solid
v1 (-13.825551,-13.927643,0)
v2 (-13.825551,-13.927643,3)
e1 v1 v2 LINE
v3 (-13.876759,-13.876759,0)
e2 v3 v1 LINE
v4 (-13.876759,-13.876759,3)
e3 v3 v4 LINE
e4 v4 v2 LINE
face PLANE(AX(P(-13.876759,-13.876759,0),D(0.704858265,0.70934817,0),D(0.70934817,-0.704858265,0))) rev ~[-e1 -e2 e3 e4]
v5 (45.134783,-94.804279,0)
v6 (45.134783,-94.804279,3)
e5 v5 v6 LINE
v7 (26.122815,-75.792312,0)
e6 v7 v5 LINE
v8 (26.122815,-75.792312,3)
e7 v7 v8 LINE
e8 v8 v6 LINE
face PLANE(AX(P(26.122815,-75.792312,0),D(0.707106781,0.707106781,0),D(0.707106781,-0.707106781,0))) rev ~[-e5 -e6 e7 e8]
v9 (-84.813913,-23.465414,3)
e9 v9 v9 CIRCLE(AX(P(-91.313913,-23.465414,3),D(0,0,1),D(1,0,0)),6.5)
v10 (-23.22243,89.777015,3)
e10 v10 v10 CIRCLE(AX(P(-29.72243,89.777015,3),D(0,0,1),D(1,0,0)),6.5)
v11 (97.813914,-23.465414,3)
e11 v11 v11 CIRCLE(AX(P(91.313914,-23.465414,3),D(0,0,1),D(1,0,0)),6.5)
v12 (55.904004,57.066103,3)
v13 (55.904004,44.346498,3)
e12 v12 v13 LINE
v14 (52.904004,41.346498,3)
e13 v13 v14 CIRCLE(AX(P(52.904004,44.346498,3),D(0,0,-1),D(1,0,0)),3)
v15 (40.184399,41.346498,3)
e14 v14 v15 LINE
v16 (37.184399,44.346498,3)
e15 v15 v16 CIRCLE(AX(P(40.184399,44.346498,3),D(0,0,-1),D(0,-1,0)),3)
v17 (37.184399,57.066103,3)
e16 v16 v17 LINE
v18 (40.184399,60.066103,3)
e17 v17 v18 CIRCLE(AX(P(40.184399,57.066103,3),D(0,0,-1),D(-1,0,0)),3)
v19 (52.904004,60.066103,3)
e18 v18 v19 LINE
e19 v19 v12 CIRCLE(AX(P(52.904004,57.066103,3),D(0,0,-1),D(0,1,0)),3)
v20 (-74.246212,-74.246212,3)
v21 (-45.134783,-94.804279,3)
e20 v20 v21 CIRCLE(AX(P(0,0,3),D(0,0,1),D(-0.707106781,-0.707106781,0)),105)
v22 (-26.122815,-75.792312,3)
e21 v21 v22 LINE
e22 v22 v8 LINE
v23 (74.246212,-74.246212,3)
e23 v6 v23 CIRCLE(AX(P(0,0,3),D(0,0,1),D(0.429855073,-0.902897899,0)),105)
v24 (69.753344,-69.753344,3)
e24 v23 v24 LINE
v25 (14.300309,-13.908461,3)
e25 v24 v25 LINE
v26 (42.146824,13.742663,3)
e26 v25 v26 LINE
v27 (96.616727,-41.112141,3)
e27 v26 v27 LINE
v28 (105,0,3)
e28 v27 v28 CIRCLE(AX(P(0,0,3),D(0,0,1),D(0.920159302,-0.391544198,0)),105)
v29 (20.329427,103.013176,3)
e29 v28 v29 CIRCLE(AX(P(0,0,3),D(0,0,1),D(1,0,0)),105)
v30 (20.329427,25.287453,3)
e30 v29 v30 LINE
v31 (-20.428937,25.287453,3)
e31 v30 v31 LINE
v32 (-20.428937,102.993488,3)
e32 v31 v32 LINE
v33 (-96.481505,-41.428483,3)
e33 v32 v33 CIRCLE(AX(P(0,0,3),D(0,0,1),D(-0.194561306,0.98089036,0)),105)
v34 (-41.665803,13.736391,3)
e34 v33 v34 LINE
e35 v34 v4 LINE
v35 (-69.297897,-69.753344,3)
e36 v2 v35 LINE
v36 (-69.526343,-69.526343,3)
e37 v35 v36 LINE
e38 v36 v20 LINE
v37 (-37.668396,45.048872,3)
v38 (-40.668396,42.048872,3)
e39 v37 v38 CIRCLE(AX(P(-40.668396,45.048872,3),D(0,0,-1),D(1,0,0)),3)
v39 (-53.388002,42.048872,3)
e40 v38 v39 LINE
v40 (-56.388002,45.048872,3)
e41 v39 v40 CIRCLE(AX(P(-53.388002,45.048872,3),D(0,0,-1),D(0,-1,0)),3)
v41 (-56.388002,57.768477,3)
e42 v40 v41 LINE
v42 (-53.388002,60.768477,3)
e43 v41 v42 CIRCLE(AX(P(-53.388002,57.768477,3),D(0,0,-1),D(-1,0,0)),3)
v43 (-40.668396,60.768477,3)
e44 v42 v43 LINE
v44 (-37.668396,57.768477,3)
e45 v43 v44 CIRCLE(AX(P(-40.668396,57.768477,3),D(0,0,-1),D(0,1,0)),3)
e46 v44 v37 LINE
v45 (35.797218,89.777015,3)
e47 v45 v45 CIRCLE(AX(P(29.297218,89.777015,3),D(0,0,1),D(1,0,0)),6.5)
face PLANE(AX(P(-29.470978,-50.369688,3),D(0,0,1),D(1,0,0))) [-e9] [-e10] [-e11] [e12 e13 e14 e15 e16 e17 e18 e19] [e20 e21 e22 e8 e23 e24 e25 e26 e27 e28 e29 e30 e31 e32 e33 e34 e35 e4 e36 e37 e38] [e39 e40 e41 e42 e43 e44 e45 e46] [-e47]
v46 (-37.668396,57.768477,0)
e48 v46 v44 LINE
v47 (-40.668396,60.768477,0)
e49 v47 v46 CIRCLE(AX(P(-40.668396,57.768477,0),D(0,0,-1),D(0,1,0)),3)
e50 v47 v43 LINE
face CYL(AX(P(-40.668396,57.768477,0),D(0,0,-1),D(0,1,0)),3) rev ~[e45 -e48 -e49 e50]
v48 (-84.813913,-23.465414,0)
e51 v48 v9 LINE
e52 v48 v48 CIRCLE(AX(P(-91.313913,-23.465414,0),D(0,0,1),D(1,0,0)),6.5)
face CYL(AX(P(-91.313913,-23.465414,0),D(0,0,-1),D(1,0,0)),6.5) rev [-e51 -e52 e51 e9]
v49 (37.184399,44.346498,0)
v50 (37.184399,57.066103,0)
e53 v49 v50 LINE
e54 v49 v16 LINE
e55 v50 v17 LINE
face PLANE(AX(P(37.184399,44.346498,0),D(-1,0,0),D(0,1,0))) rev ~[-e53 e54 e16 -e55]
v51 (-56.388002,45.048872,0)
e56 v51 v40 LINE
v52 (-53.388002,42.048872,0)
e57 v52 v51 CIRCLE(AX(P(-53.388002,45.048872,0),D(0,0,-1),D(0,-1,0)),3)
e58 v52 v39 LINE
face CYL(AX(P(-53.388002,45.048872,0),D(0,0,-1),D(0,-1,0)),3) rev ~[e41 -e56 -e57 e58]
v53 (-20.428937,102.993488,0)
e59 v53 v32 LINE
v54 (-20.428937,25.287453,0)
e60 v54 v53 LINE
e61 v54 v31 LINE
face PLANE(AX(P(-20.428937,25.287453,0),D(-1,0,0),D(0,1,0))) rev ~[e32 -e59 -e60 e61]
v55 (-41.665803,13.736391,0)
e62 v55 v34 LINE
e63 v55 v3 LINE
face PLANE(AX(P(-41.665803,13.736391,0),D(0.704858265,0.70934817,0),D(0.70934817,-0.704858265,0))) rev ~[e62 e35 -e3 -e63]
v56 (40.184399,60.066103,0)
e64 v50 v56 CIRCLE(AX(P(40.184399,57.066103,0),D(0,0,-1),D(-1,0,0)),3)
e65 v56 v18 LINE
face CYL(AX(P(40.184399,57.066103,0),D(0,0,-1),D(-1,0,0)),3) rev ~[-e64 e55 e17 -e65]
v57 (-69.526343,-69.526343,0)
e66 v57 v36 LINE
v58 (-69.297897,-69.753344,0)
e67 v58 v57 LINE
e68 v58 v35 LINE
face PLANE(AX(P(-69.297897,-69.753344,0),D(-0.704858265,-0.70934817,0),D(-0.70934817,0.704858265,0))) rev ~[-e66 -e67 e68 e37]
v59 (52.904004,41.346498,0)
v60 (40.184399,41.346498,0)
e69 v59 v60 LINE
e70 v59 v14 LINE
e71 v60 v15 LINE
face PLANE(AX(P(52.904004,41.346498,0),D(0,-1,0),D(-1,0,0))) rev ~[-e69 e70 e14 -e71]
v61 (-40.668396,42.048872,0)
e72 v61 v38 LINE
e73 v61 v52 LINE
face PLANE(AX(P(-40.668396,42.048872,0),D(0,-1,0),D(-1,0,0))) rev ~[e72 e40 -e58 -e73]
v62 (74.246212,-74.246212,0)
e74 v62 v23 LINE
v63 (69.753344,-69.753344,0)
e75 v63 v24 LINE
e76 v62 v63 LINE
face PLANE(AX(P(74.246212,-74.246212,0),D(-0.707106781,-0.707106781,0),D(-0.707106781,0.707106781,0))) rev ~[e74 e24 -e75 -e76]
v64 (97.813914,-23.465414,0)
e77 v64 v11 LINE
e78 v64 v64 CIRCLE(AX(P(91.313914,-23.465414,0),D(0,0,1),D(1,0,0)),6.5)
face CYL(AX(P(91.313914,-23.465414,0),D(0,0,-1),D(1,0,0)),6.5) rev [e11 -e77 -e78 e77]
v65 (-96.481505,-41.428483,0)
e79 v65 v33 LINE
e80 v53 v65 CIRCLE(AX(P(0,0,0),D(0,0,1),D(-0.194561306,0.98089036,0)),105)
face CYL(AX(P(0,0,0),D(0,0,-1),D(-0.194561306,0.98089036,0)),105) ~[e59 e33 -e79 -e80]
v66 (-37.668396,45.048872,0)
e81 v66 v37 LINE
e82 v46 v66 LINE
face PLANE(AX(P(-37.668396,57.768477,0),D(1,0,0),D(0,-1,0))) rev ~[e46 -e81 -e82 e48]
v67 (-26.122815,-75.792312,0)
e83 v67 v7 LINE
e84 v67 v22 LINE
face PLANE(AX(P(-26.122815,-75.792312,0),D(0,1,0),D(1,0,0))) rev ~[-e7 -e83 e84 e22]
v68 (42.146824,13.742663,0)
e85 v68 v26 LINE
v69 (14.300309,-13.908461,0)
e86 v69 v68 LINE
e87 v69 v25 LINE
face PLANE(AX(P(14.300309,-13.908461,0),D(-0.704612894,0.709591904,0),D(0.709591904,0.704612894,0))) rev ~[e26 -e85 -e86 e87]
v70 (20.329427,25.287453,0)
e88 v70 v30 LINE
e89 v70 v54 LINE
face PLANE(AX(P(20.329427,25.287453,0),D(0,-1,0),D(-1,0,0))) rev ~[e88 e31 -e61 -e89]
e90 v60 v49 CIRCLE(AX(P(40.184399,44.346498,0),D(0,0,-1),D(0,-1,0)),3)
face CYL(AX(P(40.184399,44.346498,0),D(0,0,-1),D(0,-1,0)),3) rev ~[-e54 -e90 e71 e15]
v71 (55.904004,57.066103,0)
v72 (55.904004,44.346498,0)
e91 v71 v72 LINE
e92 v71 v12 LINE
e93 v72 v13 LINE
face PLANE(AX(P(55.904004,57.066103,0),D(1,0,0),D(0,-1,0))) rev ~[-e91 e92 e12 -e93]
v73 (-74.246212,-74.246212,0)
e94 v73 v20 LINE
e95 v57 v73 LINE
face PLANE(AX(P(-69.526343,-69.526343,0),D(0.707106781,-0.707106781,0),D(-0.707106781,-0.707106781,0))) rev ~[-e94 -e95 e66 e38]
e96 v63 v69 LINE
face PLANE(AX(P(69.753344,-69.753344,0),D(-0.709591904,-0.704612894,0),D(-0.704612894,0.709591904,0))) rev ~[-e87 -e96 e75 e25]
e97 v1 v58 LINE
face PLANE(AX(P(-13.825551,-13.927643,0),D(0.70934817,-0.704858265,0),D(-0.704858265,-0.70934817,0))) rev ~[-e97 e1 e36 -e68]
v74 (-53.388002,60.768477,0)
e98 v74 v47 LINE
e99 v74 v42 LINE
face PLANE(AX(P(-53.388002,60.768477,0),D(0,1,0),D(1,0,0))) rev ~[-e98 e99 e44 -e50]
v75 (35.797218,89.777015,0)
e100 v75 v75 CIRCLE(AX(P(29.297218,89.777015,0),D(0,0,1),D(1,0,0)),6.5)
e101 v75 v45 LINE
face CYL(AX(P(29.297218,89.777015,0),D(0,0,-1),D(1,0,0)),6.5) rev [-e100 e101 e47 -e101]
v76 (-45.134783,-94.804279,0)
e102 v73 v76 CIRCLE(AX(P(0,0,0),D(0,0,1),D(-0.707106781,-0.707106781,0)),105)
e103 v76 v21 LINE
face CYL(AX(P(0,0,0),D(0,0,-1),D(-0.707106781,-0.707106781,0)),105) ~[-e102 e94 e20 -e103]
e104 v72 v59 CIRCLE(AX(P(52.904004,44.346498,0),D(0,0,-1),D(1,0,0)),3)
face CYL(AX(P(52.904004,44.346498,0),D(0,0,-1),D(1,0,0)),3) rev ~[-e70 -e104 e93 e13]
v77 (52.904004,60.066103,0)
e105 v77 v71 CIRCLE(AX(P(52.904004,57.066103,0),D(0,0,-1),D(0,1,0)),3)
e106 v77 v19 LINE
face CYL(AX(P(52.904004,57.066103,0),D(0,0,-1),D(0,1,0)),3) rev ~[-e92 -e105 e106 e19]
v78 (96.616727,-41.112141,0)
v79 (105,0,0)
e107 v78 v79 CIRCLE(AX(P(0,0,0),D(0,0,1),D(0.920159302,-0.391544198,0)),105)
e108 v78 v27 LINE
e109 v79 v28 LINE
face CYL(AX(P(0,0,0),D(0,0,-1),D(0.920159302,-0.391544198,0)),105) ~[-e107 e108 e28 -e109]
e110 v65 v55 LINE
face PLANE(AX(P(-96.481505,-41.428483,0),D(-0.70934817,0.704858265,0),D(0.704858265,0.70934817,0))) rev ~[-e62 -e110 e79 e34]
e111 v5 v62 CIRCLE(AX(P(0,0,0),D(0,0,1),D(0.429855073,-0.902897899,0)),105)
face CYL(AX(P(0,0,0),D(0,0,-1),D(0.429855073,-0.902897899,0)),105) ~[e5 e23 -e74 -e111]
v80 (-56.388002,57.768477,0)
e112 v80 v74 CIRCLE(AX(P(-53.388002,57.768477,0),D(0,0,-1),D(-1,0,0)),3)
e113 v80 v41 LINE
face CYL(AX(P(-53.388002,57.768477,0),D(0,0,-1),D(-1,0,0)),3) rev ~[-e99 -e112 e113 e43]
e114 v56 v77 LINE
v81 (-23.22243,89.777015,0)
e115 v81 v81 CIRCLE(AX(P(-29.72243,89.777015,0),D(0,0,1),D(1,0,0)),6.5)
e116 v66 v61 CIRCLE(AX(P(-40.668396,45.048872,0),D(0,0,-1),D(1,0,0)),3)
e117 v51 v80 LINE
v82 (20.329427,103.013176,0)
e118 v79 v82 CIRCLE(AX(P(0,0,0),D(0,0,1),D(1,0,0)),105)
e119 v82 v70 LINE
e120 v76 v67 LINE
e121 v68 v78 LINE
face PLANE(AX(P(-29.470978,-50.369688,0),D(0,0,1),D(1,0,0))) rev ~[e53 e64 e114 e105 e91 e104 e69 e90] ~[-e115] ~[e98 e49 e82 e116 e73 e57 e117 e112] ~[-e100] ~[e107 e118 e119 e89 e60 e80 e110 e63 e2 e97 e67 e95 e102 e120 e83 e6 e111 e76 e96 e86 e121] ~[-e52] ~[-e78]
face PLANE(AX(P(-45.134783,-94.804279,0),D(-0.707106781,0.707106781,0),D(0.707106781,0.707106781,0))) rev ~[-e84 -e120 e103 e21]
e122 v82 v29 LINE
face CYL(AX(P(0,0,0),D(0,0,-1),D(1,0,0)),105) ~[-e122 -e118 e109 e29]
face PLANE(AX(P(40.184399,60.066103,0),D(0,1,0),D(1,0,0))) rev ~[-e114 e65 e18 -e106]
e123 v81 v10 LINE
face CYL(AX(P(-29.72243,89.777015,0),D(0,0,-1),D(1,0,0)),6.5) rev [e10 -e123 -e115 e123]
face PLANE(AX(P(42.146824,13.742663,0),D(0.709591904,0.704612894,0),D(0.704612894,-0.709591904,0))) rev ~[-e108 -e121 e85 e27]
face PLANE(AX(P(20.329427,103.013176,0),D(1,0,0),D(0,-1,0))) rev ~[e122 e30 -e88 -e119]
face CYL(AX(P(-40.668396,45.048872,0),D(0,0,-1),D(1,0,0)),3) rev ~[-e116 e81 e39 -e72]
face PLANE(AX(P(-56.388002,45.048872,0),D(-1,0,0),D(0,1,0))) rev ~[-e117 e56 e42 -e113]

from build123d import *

# Parameters (mm, degrees)
F0_R     = 6.5
F1_DEPTH = 3


with BuildPart() as f1:
    # F0 (on Top) → F1 (new body)
    with BuildSketch(Plane.XY):
        with BuildLine():
            Line((-69.5263431778, -69.5263431778), (-74.2462120246, -74.2462120246))
            ThreePointArc((-74.2462120246, -74.2462120246), (-60.5690845883, -85.7693767736), (-45.1347826829, -94.804279398))
            Line((-45.1347826829, -94.804279398), (-26.1228149757, -75.7923116907))
            Line((-26.1228149757, -75.7923116907), (0, -49.6694967151))
            Line((0, -49.6694967151), (0, 0))
            Line((0, 0), (-13.8767590343, -13.8767590343))
            Line((-13.8767590343, -13.8767590343), (-13.825551364, -13.9276425795))
            Line((-13.825551364, -13.9276425795), (-69.2978968304, -69.7533435465))
            Line((-69.2978968304, -69.7533435465), (-69.5263431778, -69.5263431778))
        make_face()
        Polygon((0, -49.6694967151), (-26.1228149757, -75.7923116907), (0, -75.7923116907), (0, -64.7160249151), align=None)
        with BuildLine():
            ThreePointArc((-20.428937125, 102.9934877939), (-92.9055396428, 48.9240299208), (-96.4815047793, -41.4284833844))
            Line((-96.4815047793, -41.4284833844), (-41.6658031427, 13.7363909711))
            Line((-41.6658031427, 13.7363909711), (-13.8767590343, -13.8767590343))
            Line((-13.8767590343, -13.8767590343), (0, 0))
            Line((0, 0), (0, 25.2874530852))
            Line((0, 25.2874530852), (-20.428937125, 25.2874530852))
            Line((-20.428937125, 25.2874530852), (-20.428937125, 102.9934877939))
        make_face()
        with Locations((-91.3139134645, -23.4654136002)):
            Circle(F0_R, mode=Mode.SUBTRACT)
        with BuildLine():
            ThreePointArc((-56.388001889, 57.7684769799), (-55.5093222326, 59.8897973234), (-53.388001889, 60.7684769799))
            Line((-53.388001889, 60.7684769799), (-40.6683964263, 60.7684769799))
            ThreePointArc((-40.6683964263, 60.7684769799), (-38.5470760828, 59.8897973234), (-37.6683964263, 57.7684769799))
            Line((-37.6683964263, 57.7684769799), (-37.6683964263, 45.0488715172))
            ThreePointArc((-37.6683964263, 45.0488715172), (-38.5470760828, 42.9275511736), (-40.6683964263, 42.0488715172))
            Line((-40.6683964263, 42.0488715172), (-53.388001889, 42.0488715172))
            ThreePointArc((-53.388001889, 42.0488715172), (-55.5093222326, 42.9275511736), (-56.388001889, 45.0488715172))
            Line((-56.388001889, 45.0488715172), (-56.388001889, 57.7684769799))
        make_face(mode=Mode.SUBTRACT)
        with Locations((-29.722429812, 89.7770151496)):
            Circle(F0_R, mode=Mode.SUBTRACT)
        with BuildLine():
            Line((26.1228149757, -75.7923116907), (45.1347826829, -94.804279398))
            ThreePointArc((45.1347826829, -94.804279398), (60.5690845883, -85.7693767736), (74.2462120246, -74.2462120246))
            Line((74.2462120246, -74.2462120246), (69.7533435465, -69.7533435465))
            Line((69.7533435465, -69.7533435465), (0, 0))
            Line((0, 0), (0, -49.6694967151))
            Line((0, -49.6694967151), (26.1228149757, -75.7923116907))
        make_face()
        Polygon((0, -64.7160249151), (0, -75.7923116907), (26.1228149757, -75.7923116907), (0, -49.6694967151), align=None)
        with BuildLine():
            Line((0, 25.2874530852), (0, 0))
            Line((0, 0), (69.7533435465, -69.7533435465))
            Line((69.7533435465, -69.7533435465), (14.3003088274, -13.9084606974))
            Line((14.3003088274, -13.9084606974), (42.1468239183, 13.7426630826))
            Line((42.1468239183, 13.7426630826), (96.6167267267, -41.1121407447))
            ThreePointArc((96.6167267267, -41.1121407447), (102.8828370194, -20.9790811726), (105, 0))
            ThreePointArc((105, 0), (81.1159350321, 66.6723712182), (20.3294269741, 103.013175851))
            Line((20.3294269741, 103.013175851), (20.3294269741, 25.2874530852))
            Line((20.3294269741, 25.2874530852), (0, 25.2874530852))
        make_face()
        with Locations((91.3139144, -23.4654136002)):
            Circle(F0_R, mode=Mode.SUBTRACT)
        with BuildLine():
            ThreePointArc((37.1843986213, 57.0661032964), (38.0630782778, 59.18742364), (40.1843986213, 60.0661032964))
            Line((40.1843986213, 60.0661032964), (52.904004084, 60.0661032964))
            ThreePointArc((52.904004084, 60.0661032964), (55.0253244276, 59.18742364), (55.904004084, 57.0661032964))
            Line((55.904004084, 57.0661032964), (55.904004084, 44.3464978337))
            ThreePointArc((55.904004084, 44.3464978337), (55.0253244276, 42.2251774902), (52.904004084, 41.3464978337))
            Line((52.904004084, 41.3464978337), (40.1843986213, 41.3464978337))
            ThreePointArc((40.1843986213, 41.3464978337), (38.0630782778, 42.2251774902), (37.1843986213, 44.3464978337))
            Line((37.1843986213, 44.3464978337), (37.1843986213, 57.0661032964))
        make_face(mode=Mode.SUBTRACT)
        with Locations((29.2972179146, 89.7770151496)):
            Circle(F0_R, mode=Mode.SUBTRACT)
    extrude(amount=F1_DEPTH)


solid = f1.part
